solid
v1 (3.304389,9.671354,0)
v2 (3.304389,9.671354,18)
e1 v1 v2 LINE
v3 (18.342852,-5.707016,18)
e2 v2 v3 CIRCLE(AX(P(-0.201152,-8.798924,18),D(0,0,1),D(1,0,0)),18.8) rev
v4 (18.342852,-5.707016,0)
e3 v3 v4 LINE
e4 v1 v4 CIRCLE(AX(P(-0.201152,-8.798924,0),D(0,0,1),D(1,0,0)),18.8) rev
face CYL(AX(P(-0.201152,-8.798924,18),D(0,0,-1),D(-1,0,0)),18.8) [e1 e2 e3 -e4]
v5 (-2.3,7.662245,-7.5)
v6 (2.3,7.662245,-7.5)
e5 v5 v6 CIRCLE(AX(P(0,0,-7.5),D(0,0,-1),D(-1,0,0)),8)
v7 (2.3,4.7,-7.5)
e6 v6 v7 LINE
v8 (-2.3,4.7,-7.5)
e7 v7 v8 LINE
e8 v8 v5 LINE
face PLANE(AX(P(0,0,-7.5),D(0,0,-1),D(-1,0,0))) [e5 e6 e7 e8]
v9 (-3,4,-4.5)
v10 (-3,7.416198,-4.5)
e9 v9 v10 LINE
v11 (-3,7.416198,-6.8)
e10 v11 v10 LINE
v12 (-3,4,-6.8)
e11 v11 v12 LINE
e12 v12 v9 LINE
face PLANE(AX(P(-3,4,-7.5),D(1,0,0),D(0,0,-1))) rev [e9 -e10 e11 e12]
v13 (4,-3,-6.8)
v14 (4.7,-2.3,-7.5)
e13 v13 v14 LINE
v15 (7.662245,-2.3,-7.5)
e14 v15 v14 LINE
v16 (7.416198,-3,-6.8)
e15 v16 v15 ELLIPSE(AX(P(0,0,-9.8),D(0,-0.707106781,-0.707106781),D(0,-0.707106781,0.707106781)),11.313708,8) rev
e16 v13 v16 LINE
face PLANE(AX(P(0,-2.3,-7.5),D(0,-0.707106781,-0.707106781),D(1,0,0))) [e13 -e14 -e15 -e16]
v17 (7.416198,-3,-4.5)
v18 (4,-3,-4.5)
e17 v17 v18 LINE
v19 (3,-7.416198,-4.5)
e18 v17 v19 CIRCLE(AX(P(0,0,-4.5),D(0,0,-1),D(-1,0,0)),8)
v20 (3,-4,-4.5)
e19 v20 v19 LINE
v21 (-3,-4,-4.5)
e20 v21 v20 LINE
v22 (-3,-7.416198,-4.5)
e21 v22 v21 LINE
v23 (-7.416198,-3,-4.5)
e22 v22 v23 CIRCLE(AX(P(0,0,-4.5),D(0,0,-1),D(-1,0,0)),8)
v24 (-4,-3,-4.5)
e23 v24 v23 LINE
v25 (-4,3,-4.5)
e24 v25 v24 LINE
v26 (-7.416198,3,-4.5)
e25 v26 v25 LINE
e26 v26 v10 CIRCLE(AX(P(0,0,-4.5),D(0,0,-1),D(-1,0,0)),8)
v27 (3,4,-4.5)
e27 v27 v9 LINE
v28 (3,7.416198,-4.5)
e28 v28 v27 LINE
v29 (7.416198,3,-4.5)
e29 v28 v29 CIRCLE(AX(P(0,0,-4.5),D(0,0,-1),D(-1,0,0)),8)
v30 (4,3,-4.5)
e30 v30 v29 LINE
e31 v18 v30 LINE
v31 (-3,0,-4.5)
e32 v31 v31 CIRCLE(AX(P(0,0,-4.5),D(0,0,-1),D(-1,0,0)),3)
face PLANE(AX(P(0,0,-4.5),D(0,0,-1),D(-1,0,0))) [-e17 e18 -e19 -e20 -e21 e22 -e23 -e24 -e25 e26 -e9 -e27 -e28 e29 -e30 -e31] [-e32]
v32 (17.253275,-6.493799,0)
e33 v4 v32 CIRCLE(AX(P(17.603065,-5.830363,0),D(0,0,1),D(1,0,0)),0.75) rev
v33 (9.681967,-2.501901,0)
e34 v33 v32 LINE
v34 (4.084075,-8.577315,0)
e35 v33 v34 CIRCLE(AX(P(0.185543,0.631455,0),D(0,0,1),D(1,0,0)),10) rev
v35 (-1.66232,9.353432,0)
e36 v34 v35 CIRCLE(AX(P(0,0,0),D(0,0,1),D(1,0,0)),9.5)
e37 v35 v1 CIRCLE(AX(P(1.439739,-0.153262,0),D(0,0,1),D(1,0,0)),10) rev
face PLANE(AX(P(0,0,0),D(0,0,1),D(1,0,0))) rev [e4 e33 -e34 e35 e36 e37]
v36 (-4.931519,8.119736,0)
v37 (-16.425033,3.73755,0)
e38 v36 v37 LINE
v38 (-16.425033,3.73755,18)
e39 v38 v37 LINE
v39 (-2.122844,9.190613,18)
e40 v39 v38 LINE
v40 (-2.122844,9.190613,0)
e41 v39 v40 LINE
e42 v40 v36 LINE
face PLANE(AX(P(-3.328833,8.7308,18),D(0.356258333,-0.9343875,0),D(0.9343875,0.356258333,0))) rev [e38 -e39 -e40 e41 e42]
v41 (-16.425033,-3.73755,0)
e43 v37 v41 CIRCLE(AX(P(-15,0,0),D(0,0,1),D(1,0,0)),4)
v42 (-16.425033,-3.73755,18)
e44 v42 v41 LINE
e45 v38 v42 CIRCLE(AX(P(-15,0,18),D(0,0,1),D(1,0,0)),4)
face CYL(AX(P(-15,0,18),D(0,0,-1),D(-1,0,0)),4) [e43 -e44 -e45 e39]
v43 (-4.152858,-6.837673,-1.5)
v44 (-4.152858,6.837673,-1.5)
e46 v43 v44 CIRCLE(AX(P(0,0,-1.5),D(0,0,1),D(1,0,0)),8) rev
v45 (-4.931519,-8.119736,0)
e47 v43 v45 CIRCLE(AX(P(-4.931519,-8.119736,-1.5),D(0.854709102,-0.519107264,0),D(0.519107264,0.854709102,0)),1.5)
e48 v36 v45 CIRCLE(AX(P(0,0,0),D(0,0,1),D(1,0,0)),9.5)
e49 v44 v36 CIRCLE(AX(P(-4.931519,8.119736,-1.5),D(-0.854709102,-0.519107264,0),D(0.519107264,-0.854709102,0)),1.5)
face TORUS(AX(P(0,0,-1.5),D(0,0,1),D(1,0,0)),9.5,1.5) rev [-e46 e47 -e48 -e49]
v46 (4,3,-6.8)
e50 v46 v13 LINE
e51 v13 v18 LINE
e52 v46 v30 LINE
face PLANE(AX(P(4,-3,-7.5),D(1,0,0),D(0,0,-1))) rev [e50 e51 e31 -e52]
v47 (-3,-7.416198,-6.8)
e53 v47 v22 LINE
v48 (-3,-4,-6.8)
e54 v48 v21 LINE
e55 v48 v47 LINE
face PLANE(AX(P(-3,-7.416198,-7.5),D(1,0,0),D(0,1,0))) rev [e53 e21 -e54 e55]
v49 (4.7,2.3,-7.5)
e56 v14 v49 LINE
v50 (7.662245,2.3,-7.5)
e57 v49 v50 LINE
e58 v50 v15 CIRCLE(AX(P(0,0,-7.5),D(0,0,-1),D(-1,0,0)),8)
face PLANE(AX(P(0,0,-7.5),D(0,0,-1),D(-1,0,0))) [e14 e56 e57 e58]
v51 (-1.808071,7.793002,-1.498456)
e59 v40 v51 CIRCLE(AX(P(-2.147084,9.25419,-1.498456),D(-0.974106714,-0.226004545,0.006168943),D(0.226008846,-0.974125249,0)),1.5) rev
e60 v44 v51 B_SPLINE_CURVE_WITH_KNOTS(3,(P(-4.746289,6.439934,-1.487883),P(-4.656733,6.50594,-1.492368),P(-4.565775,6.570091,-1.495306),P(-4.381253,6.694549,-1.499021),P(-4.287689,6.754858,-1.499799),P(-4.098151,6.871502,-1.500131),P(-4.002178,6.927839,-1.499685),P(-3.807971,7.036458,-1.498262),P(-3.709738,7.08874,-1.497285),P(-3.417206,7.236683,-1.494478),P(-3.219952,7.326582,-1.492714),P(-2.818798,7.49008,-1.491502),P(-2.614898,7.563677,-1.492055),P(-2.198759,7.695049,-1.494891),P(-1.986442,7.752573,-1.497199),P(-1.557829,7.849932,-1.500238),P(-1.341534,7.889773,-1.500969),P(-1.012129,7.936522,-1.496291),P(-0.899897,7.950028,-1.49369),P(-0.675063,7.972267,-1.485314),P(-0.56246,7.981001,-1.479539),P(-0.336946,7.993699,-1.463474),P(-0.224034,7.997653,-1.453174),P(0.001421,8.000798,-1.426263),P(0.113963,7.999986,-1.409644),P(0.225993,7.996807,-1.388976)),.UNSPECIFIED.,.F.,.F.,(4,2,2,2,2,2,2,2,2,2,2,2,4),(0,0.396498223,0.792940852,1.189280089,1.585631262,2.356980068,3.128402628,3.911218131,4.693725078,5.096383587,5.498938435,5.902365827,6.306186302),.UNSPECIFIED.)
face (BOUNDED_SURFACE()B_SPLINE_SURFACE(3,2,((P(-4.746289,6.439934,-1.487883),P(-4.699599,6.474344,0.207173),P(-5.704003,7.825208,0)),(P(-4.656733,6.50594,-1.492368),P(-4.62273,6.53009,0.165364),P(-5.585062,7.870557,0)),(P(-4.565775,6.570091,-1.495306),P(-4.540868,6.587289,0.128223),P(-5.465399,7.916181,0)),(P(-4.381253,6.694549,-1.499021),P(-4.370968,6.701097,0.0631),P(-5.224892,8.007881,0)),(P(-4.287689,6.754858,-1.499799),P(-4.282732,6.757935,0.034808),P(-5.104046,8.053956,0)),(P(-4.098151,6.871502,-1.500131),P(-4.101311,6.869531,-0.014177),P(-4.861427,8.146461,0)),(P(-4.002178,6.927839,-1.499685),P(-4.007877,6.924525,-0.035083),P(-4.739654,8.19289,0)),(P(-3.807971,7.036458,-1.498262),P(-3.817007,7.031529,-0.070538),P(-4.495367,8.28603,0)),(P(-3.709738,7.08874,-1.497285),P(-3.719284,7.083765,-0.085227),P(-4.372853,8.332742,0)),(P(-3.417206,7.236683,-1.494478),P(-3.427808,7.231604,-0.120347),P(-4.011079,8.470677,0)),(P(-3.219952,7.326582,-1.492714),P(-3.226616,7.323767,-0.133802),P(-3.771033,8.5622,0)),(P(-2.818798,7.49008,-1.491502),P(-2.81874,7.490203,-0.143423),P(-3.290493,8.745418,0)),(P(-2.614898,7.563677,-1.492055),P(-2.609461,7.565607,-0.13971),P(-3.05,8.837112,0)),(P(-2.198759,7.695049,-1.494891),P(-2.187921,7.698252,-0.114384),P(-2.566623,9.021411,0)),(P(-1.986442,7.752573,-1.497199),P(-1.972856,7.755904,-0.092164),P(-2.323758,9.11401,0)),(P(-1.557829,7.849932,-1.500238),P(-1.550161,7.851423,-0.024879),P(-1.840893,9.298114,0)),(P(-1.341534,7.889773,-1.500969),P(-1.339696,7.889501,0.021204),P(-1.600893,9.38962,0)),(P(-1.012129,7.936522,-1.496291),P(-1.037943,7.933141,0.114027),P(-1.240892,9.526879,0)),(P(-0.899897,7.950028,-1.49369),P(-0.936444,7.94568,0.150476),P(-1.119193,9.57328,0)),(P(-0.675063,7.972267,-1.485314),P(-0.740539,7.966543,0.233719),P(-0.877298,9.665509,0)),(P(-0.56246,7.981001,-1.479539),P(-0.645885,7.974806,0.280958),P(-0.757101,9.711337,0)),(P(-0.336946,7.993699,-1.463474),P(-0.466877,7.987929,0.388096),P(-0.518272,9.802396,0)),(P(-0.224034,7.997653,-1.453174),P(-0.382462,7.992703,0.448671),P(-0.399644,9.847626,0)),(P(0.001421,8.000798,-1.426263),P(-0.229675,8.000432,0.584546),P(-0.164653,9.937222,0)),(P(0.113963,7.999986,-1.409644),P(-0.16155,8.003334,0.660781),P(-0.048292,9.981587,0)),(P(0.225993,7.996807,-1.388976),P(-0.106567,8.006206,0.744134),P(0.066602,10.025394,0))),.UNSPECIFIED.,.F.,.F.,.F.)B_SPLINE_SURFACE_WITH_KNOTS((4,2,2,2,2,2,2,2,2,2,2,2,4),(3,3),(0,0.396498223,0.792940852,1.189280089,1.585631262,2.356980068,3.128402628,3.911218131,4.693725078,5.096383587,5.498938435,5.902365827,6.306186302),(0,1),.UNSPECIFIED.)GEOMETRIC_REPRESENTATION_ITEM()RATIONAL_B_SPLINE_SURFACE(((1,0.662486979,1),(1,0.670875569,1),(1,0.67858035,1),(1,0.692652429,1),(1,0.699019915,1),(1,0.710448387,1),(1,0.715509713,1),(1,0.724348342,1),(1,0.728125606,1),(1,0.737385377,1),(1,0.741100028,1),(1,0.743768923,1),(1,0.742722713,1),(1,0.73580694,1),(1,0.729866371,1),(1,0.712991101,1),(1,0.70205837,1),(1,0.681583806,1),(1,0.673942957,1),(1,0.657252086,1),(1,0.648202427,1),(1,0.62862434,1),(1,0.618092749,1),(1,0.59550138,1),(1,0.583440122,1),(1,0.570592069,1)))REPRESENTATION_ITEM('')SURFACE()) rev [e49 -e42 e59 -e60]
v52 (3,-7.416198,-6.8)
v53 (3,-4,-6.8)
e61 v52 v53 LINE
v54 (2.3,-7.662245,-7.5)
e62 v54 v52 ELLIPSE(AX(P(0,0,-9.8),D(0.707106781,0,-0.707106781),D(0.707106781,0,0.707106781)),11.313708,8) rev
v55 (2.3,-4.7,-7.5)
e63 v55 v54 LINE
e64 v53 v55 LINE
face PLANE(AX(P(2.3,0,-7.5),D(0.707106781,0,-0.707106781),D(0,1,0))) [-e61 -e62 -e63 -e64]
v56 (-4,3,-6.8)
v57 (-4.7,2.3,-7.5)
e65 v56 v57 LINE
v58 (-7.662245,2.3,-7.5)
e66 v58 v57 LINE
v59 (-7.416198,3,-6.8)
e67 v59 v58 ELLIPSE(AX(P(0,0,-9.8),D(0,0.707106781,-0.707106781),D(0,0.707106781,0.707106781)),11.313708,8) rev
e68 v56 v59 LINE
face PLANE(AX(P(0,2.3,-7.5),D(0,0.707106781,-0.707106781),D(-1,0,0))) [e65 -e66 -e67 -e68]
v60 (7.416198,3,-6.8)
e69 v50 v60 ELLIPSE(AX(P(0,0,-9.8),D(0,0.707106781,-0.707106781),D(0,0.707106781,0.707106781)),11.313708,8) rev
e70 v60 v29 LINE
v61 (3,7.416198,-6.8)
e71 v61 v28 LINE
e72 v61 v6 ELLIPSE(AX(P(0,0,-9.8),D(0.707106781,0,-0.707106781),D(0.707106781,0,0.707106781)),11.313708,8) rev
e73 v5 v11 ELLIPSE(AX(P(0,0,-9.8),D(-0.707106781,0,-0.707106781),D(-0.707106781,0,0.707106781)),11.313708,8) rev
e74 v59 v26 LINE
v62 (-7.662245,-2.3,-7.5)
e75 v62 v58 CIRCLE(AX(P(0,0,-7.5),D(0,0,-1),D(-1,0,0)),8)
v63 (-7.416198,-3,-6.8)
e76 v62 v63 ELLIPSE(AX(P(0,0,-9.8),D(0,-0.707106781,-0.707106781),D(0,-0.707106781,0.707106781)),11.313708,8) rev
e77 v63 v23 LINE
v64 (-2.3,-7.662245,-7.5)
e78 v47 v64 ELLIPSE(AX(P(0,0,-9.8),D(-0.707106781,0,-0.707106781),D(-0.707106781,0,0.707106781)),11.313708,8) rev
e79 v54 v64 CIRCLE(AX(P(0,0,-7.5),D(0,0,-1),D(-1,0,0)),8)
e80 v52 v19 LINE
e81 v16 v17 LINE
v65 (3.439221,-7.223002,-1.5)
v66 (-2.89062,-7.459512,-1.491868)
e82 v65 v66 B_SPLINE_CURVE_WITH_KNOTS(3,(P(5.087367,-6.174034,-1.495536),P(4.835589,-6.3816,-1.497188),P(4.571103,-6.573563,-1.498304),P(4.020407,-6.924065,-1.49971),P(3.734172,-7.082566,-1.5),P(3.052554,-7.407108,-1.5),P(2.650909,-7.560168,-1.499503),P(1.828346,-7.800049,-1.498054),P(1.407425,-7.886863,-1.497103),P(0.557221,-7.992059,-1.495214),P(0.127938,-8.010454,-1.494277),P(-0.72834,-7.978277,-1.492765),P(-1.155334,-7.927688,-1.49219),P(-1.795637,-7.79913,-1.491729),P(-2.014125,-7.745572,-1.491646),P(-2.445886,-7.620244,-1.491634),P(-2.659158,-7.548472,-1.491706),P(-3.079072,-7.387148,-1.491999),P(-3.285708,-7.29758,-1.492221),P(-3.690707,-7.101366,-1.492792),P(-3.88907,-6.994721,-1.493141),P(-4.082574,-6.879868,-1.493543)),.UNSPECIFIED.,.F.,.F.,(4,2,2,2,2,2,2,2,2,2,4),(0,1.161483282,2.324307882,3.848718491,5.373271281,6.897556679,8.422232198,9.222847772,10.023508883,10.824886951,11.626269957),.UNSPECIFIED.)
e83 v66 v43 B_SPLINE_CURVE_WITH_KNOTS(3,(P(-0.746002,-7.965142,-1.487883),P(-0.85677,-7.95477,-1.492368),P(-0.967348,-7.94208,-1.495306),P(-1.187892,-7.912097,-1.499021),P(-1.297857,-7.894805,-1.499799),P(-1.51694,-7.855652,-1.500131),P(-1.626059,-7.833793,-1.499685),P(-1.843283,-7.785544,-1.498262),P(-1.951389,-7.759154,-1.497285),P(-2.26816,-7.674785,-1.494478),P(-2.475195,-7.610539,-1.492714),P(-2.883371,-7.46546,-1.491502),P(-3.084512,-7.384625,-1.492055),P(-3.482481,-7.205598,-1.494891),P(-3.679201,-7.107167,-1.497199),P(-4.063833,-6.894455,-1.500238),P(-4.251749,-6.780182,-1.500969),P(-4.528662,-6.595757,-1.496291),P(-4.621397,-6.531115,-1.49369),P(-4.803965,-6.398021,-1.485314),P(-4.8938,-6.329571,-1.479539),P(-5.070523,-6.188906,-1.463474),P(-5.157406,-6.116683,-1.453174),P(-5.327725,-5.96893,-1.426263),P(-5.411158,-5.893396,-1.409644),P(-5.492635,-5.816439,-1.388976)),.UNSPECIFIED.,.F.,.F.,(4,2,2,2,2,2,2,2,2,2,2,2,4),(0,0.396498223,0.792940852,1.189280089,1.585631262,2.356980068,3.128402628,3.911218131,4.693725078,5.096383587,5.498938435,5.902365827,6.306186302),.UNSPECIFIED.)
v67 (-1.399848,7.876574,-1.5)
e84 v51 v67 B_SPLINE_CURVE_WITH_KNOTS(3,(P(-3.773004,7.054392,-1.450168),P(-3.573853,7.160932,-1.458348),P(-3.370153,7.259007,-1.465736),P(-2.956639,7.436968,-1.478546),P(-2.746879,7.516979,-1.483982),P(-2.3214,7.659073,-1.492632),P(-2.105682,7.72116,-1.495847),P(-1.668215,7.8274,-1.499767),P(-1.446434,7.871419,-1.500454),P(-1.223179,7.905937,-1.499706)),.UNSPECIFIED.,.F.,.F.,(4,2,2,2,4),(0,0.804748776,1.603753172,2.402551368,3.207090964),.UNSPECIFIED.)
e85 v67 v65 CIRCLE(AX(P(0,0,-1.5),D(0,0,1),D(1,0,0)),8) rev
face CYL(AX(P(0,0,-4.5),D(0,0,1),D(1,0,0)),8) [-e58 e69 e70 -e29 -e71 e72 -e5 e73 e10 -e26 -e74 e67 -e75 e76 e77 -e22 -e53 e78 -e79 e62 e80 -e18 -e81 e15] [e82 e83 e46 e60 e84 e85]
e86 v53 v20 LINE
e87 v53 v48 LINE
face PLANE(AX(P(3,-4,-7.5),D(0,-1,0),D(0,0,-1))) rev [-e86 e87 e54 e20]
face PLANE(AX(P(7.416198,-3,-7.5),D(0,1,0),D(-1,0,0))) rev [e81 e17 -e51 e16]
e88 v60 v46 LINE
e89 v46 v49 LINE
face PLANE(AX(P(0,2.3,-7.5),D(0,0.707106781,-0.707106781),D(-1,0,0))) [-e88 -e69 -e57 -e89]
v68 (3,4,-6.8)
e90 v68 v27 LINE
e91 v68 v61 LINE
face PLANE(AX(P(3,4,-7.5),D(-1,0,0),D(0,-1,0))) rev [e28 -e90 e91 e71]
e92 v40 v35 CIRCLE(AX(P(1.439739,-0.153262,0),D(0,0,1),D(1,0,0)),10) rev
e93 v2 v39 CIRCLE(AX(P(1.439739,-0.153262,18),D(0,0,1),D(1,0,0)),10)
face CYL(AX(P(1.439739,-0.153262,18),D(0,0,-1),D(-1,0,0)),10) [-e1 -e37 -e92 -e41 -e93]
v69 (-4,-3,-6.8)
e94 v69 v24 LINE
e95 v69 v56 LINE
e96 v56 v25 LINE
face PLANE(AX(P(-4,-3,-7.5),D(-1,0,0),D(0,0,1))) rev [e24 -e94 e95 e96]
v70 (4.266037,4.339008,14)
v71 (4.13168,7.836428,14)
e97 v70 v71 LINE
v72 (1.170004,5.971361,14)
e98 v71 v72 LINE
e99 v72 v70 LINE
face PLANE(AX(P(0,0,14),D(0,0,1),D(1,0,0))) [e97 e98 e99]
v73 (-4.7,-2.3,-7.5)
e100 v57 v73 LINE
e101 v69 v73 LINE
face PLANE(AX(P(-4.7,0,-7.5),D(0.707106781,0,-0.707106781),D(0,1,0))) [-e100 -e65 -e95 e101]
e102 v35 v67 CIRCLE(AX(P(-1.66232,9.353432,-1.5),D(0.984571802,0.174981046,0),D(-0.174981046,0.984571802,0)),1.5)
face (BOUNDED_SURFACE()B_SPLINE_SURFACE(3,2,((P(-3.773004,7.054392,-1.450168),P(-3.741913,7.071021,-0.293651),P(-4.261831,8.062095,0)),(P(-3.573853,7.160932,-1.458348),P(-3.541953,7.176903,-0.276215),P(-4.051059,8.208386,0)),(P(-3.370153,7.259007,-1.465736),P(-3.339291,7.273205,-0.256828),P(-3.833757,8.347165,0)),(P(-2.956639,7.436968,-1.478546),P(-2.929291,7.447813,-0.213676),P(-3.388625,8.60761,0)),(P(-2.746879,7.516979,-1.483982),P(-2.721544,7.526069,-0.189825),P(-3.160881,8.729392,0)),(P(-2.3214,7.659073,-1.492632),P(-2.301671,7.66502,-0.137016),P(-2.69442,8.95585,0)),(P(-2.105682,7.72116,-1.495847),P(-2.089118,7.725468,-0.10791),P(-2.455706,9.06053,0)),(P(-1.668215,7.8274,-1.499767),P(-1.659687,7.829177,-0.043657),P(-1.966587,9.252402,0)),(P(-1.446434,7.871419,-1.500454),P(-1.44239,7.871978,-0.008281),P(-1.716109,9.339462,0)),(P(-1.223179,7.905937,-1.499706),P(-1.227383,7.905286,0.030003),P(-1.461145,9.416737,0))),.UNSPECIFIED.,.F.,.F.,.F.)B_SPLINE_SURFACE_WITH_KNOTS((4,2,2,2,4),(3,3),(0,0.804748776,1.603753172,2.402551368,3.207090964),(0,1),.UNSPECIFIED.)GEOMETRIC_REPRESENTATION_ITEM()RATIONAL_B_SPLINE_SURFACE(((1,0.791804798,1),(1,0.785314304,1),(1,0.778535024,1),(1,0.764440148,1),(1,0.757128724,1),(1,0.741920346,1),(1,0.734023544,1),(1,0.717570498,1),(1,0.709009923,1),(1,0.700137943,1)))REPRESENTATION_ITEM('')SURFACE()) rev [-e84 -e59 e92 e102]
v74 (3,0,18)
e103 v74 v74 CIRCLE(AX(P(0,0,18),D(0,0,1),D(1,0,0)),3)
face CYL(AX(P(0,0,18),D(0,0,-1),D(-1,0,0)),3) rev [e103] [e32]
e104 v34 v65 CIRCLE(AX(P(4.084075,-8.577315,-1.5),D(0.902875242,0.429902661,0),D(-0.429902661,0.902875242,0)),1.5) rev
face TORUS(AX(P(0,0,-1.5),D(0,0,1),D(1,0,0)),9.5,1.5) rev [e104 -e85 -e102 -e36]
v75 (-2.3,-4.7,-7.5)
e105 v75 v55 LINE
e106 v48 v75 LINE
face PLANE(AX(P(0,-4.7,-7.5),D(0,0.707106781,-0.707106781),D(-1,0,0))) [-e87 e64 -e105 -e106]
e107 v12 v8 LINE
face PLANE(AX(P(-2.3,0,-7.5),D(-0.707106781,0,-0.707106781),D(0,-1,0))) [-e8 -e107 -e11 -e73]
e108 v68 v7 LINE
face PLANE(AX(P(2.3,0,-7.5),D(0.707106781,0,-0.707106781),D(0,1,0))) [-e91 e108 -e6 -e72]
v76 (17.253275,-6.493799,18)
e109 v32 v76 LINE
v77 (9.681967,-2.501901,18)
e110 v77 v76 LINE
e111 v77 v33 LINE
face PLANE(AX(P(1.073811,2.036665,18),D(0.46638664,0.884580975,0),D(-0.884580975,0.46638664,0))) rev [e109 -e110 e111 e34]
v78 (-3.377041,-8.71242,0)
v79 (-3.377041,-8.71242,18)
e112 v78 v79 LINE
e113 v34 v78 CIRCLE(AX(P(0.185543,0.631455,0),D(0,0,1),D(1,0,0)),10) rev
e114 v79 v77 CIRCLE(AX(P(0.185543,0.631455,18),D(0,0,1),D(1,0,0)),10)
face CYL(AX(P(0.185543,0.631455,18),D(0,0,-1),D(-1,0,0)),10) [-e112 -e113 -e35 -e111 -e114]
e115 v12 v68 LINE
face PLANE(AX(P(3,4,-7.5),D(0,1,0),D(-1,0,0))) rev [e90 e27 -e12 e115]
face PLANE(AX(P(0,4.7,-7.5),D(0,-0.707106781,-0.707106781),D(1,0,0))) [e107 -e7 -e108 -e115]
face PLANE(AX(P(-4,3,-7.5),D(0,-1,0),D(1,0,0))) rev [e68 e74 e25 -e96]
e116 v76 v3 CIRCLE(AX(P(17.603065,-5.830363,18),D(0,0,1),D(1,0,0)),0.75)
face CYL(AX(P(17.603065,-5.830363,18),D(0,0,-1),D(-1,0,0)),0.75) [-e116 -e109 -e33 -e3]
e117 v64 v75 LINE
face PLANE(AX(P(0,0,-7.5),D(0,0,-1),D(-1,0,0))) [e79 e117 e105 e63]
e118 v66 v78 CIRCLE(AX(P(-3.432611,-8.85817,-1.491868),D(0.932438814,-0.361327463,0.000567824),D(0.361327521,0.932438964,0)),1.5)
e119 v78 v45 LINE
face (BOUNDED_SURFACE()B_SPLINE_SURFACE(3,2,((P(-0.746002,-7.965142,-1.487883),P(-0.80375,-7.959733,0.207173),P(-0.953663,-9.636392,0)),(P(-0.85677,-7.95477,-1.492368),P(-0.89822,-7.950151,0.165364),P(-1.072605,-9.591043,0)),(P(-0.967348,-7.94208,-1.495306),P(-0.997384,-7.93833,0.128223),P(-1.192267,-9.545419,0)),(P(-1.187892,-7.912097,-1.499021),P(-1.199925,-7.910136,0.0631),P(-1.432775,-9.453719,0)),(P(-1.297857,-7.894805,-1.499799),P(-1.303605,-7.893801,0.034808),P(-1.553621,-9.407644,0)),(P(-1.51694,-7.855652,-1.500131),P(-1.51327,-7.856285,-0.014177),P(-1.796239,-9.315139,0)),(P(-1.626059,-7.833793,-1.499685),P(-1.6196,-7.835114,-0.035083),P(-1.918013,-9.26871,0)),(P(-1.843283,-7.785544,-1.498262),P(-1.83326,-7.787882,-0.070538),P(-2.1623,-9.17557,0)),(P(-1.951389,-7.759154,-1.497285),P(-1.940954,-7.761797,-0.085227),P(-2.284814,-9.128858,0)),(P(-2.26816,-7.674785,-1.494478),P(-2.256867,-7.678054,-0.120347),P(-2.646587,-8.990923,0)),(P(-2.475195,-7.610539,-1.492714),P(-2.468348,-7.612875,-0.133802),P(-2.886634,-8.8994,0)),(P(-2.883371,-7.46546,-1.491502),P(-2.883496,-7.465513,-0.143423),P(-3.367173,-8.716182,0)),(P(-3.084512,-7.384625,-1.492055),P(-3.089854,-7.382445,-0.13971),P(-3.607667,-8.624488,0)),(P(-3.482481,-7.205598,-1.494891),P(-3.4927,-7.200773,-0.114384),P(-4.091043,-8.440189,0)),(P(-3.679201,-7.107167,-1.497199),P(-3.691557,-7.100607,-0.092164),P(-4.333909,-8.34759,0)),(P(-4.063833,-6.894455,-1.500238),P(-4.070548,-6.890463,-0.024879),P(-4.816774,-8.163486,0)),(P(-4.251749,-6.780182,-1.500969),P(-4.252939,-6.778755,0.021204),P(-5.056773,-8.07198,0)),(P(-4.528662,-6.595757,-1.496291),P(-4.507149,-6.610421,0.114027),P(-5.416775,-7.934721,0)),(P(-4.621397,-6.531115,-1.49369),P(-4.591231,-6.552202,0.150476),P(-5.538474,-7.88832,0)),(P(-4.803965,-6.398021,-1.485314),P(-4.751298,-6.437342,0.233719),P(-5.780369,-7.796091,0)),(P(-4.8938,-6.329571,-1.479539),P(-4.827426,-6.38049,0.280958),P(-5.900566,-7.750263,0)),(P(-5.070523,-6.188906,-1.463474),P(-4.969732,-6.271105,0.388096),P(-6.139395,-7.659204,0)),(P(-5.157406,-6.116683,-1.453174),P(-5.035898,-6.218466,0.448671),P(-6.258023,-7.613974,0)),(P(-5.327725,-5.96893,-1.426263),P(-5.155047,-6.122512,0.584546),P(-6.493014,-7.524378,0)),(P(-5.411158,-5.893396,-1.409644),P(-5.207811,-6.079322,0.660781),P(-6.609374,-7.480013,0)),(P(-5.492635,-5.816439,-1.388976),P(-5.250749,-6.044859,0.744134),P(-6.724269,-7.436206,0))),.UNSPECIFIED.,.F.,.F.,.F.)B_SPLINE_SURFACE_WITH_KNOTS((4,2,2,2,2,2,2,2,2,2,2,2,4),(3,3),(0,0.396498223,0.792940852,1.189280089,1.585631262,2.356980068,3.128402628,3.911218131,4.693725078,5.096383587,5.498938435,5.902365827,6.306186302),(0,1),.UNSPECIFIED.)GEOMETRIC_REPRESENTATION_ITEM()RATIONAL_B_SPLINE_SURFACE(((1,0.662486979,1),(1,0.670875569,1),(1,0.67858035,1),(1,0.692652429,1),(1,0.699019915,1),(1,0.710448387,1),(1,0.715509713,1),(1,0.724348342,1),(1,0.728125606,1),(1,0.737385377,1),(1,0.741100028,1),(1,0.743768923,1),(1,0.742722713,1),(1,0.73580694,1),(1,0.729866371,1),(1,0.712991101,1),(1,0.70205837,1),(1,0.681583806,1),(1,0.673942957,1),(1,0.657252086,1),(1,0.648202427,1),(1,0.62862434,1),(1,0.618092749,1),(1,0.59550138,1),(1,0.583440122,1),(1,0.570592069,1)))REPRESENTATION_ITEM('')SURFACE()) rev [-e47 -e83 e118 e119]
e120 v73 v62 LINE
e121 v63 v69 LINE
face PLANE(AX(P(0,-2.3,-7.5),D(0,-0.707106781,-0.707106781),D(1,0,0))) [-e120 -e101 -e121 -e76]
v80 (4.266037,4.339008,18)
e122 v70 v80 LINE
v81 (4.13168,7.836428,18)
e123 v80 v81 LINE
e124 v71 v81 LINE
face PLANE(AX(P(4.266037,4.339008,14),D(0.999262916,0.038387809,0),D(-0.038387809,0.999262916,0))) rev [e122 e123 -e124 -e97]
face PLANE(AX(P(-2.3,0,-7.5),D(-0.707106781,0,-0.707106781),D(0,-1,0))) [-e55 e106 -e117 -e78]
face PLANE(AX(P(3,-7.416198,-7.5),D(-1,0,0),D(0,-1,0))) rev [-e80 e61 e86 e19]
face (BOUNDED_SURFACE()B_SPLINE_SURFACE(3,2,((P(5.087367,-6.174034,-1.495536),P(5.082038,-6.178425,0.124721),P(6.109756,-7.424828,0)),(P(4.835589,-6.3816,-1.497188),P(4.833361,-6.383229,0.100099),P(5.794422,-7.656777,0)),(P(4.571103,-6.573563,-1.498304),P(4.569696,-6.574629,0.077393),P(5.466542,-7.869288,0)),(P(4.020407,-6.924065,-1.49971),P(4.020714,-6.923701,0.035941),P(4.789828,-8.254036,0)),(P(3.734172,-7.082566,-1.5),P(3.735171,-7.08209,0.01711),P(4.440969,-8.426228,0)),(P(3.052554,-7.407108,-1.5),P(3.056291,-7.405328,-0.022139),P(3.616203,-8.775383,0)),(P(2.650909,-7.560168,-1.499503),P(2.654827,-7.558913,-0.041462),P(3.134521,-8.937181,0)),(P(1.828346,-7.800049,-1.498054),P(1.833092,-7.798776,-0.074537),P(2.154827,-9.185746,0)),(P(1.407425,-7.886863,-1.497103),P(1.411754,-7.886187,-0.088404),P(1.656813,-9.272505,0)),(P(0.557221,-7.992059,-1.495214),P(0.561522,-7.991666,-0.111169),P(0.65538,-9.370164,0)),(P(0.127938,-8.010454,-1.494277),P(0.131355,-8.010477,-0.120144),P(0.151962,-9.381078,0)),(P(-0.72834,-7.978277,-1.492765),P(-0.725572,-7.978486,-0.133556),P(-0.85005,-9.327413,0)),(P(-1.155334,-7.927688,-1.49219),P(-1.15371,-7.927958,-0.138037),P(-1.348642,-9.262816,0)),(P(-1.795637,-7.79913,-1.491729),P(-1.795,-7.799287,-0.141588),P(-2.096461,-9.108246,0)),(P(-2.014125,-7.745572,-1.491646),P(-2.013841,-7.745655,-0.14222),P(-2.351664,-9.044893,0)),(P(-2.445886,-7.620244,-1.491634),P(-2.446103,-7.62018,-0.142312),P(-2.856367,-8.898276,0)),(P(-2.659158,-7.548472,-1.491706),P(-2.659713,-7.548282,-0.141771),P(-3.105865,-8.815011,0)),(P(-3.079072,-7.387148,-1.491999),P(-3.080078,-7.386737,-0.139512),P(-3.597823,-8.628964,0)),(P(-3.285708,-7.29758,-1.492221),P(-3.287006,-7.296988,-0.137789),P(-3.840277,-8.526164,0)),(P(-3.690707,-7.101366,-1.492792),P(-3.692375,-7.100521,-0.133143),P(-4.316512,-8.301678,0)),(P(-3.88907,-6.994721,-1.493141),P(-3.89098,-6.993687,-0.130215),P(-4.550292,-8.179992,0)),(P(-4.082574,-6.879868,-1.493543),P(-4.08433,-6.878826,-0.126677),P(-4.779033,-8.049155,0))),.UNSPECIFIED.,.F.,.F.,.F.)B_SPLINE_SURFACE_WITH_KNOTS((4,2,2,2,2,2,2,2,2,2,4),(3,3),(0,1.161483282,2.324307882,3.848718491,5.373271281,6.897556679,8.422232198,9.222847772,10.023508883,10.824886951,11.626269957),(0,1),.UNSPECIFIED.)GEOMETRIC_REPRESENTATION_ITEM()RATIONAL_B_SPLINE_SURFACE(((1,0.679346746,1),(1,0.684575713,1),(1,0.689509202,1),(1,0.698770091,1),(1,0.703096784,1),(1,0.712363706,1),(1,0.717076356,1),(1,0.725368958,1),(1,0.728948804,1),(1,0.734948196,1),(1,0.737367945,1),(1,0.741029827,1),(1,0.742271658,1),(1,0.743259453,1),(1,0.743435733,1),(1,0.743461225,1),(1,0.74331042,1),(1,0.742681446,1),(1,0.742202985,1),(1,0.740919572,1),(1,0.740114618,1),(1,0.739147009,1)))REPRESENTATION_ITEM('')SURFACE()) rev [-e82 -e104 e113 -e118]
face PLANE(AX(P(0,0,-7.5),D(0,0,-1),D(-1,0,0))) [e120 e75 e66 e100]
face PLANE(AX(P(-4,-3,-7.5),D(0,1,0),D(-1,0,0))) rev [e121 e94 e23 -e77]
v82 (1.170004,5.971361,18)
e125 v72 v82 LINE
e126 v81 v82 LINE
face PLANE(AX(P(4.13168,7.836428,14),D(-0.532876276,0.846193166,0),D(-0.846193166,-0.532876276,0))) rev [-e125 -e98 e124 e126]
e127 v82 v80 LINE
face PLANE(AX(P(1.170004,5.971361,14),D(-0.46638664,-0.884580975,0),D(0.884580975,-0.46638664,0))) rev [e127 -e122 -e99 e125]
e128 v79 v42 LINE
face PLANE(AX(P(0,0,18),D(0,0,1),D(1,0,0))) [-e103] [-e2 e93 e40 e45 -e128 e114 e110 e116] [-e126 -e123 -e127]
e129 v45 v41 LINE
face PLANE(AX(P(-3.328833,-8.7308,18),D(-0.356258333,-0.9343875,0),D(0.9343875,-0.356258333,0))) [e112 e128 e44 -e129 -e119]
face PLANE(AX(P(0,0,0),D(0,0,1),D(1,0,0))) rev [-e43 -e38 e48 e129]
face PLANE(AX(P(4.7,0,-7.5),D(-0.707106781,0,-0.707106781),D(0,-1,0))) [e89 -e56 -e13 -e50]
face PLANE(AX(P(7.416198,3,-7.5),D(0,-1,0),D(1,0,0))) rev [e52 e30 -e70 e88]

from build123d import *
from build123d.topology import SkipClean

# Parameters (mm, degrees)
ESBO_O1_R                      = 3
ESBO_O1_R_2                    = 4
RESSALTO_EXTRUS_O1_DEPTH       = 18
FILETE1_R                      = 0.75
FILETE2_R                      = 10
CORTE_EXTRUS_O1_DEPTH          = 4
FILETE3_START                  = -1
FILETE3_DEPTH                  = 20
RESSALTO_EXTRUS_O2_START       = 4.5
ESBO_O3_R                      = 8
ESBO_O3_R_2                    = 3
RESSALTO_EXTRUS_O2_DEPTH       = 4.5
FILETE4_R                      = 1.5
RESSALTO_EXTRUS_O3_DEPTH       = 3
RESSALTO_EXTRUS_O3_2_OUTLINE_R = 3
RESSALTO_EXTRUS_O3_2_DEPTH     = 3
CHANFRO1_SIZE                  = 0.7
CORTE_EXTRUS_O2_DEPTH          = 32.051703035
CORTE_EXTRUS_O2_DEPTH_BACK     = 32.051703035
ESBO_O5_R                      = 3


with BuildPart() as part:
    # Esboço1 → Ressalto-extrusão1 (new body)
    # profile 1 of 2: a face of its own
    with BuildSketch(Plane.XY):
        with BuildLine():
            ThreePointArc((18.527777033, -7.165767596), (12.575893163, 4.991910238), (0, 10))
            Line((0, 10), (-16.425033333, 3.73755))
            ThreePointArc((-16.425033333, 3.73755), (-12.730653545, 3.293943938), (-11, 0))
            ThreePointArc((-11, 0), (-12.730653545, -3.293943938), (-16.425033333, -3.73755))
            Line((-16.425033333, -3.73755), (0, -10))
            ThreePointArc((0, -10), (6.122948149, -7.906295338), (9.681967281, -2.501901193))
            Line((9.681967281, -2.501901193), (18.527777033, -7.165767596))
        make_face()
        Circle(ESBO_O1_R, mode=Mode.SUBTRACT)
    # profile 2 of 2: a face of its own
    with BuildSketch(Plane.XY):
        with Locations((-15, 0)):
            Circle(ESBO_O1_R_2)
    extrude(amount=RESSALTO_EXTRUS_O1_DEPTH)

    # Filete1
    filete1_edges = [part.edges().sort_by_distance(p)[0] for p in [
        (18.527777033, -7.165767596, 9),
    ]]
    fillet(filete1_edges, radius=FILETE1_R)

    # Filete2
    filete2_edges = [part.edges().sort_by_distance(p)[0] for p in [
        (0, 10, 9),
    ]]
    fillet(filete2_edges, radius=FILETE2_R)

    # Esboço2 → Corte-extrusão1 (cut)
    with BuildSketch(Plane.XY.offset(18)):
        Polygon((4.131679723, 7.836427896), (1.170003642, 5.97136093), (4.266037055, 4.339007689), align=None)
    extrude(amount=-CORTE_EXTRUS_O1_DEPTH, mode=Mode.SUBTRACT)

    # Filete3: read off the stored shape, not the designer's step
    # Filete3 outline → Filete3 (cut)
    with BuildSketch(Plane.XY.offset(FILETE3_START)):
        with BuildLine():
            ThreePointArc((0, -10), (6.122948149, -7.906295338), (9.681967281, -2.501901193))
            ThreePointArc((9.681967281, -2.501901193), (4.480336522, -8.399311502), (-3.377040528, -8.712419815))
            Line((-3.377040528, -8.712419815), (0, -10))
        make_face()
    extrude(amount=FILETE3_DEPTH, mode=Mode.SUBTRACT)

    # Esboço3 → Ressalto-extrusão2 (add)
    with SkipClean():  # the faces are left unmerged after this step: merging them gives an invalid solid
        with BuildSketch(Plane(origin=(0, 0, 0), x_dir=(-1, 0, 0), z_dir=(0, 0, -1)).offset(RESSALTO_EXTRUS_O2_START)):
            with Locations(Location((0, 0, 0), (0, 0, 180))):
                Circle(ESBO_O3_R)
            Circle(ESBO_O3_R_2, mode=Mode.SUBTRACT)
        extrude(amount=-RESSALTO_EXTRUS_O2_DEPTH)

    # Filete4
    filete4_edges = [part.edges().sort_by_distance(p)[0] for p in [
        (-8, 0, 0),
    ]]
    fillet(filete4_edges, radius=FILETE4_R)

    # Ressalto-extrusão3: read off the stored shape, not the designer's step
    # Ressalto-extrusão3 outline → Ressalto-extrusão3 (add)
    with SkipClean():  # the faces are left unmerged after this step: merging them gives an invalid solid
        with BuildSketch(Plane(origin=(0, 0, -4.5), x_dir=(-1, 0, 0), z_dir=(0, 0, -1))):
            with BuildLine():
                ThreePointArc((7.416198487, -3), (8, 0), (7.416198487, 3))
                Line((7.416198487, 3), (4, 3))
                Line((4, 3), (4, -3))
                Line((4, -3), (7.416198487, -3))
            make_face()
            with BuildLine():
                Line((3, 4), (3, 7.416198487))
                ThreePointArc((3, 7.416198487), (0, 8), (-3, 7.416198487))
                Line((-3, 7.416198487), (-3, 4))
                Line((-3, 4), (3, 4))
            make_face()
            with BuildLine():
                ThreePointArc((-3, -7.416198487), (0, -8), (3, -7.416198487))
                Line((3, -7.416198487), (3, -4))
                Line((3, -4), (-3, -4))
                Line((-3, -4), (-3, -7.416198487))
            make_face()
            with BuildLine():
                Line((-4, 3), (-7.416198487, 3))
                ThreePointArc((-7.416198487, 3), (-8, 0), (-7.416198487, -3))
                Line((-7.416198487, -3), (-4, -3))
                Line((-4, -3), (-4, 3))
            make_face()
        extrude(amount=RESSALTO_EXTRUS_O3_DEPTH)

    # Chanfro1
    chanfro1_edges = [part.edges().sort_by_distance(p)[0] for p in [
        (4, 0, -7.5),
        (5.708099243, 3, -7.5),
        (5.708099243, -3, -7.5),
        (-5.708099243, 3, -7.5),
        (-4, 0, -7.5),
        (-5.708099243, -3, -7.5),
        (0, -4, -7.5),
        (3, -5.708099243, -7.5),
        (-3, -5.708099243, -7.5),
        (3, 5.708099243, -7.5),
        (0, 4, -7.5),
        (-3, 5.708099243, -7.5),
    ]]
    chamfer(chanfro1_edges, length=CHANFRO1_SIZE)


with BuildPart() as body_2:
    # Ressalto-extrus_o3 2 outline → Ressalto-extrus_o3 2 (new body)
    with BuildSketch(Plane(origin=(0, 0, -4.5), x_dir=(-1, 0, 0), z_dir=(0, 0, -1))):
        Circle(RESSALTO_EXTRUS_O3_2_OUTLINE_R)
    extrude(amount=RESSALTO_EXTRUS_O3_2_DEPTH)

    # Esboço5 → Corte-extrusão2 (cut, two sides: drawn at the far end of the back side and taken through both)
    with BuildSketch(Plane.XY.offset(-4.5).offset(-CORTE_EXTRUS_O2_DEPTH_BACK)):
        with Locations(Location((0, 0, 0), (0, 0, 180))):
            Circle(ESBO_O5_R)
    extrude(amount=CORTE_EXTRUS_O2_DEPTH + CORTE_EXTRUS_O2_DEPTH_BACK, mode=Mode.SUBTRACT)


solid = part.part
